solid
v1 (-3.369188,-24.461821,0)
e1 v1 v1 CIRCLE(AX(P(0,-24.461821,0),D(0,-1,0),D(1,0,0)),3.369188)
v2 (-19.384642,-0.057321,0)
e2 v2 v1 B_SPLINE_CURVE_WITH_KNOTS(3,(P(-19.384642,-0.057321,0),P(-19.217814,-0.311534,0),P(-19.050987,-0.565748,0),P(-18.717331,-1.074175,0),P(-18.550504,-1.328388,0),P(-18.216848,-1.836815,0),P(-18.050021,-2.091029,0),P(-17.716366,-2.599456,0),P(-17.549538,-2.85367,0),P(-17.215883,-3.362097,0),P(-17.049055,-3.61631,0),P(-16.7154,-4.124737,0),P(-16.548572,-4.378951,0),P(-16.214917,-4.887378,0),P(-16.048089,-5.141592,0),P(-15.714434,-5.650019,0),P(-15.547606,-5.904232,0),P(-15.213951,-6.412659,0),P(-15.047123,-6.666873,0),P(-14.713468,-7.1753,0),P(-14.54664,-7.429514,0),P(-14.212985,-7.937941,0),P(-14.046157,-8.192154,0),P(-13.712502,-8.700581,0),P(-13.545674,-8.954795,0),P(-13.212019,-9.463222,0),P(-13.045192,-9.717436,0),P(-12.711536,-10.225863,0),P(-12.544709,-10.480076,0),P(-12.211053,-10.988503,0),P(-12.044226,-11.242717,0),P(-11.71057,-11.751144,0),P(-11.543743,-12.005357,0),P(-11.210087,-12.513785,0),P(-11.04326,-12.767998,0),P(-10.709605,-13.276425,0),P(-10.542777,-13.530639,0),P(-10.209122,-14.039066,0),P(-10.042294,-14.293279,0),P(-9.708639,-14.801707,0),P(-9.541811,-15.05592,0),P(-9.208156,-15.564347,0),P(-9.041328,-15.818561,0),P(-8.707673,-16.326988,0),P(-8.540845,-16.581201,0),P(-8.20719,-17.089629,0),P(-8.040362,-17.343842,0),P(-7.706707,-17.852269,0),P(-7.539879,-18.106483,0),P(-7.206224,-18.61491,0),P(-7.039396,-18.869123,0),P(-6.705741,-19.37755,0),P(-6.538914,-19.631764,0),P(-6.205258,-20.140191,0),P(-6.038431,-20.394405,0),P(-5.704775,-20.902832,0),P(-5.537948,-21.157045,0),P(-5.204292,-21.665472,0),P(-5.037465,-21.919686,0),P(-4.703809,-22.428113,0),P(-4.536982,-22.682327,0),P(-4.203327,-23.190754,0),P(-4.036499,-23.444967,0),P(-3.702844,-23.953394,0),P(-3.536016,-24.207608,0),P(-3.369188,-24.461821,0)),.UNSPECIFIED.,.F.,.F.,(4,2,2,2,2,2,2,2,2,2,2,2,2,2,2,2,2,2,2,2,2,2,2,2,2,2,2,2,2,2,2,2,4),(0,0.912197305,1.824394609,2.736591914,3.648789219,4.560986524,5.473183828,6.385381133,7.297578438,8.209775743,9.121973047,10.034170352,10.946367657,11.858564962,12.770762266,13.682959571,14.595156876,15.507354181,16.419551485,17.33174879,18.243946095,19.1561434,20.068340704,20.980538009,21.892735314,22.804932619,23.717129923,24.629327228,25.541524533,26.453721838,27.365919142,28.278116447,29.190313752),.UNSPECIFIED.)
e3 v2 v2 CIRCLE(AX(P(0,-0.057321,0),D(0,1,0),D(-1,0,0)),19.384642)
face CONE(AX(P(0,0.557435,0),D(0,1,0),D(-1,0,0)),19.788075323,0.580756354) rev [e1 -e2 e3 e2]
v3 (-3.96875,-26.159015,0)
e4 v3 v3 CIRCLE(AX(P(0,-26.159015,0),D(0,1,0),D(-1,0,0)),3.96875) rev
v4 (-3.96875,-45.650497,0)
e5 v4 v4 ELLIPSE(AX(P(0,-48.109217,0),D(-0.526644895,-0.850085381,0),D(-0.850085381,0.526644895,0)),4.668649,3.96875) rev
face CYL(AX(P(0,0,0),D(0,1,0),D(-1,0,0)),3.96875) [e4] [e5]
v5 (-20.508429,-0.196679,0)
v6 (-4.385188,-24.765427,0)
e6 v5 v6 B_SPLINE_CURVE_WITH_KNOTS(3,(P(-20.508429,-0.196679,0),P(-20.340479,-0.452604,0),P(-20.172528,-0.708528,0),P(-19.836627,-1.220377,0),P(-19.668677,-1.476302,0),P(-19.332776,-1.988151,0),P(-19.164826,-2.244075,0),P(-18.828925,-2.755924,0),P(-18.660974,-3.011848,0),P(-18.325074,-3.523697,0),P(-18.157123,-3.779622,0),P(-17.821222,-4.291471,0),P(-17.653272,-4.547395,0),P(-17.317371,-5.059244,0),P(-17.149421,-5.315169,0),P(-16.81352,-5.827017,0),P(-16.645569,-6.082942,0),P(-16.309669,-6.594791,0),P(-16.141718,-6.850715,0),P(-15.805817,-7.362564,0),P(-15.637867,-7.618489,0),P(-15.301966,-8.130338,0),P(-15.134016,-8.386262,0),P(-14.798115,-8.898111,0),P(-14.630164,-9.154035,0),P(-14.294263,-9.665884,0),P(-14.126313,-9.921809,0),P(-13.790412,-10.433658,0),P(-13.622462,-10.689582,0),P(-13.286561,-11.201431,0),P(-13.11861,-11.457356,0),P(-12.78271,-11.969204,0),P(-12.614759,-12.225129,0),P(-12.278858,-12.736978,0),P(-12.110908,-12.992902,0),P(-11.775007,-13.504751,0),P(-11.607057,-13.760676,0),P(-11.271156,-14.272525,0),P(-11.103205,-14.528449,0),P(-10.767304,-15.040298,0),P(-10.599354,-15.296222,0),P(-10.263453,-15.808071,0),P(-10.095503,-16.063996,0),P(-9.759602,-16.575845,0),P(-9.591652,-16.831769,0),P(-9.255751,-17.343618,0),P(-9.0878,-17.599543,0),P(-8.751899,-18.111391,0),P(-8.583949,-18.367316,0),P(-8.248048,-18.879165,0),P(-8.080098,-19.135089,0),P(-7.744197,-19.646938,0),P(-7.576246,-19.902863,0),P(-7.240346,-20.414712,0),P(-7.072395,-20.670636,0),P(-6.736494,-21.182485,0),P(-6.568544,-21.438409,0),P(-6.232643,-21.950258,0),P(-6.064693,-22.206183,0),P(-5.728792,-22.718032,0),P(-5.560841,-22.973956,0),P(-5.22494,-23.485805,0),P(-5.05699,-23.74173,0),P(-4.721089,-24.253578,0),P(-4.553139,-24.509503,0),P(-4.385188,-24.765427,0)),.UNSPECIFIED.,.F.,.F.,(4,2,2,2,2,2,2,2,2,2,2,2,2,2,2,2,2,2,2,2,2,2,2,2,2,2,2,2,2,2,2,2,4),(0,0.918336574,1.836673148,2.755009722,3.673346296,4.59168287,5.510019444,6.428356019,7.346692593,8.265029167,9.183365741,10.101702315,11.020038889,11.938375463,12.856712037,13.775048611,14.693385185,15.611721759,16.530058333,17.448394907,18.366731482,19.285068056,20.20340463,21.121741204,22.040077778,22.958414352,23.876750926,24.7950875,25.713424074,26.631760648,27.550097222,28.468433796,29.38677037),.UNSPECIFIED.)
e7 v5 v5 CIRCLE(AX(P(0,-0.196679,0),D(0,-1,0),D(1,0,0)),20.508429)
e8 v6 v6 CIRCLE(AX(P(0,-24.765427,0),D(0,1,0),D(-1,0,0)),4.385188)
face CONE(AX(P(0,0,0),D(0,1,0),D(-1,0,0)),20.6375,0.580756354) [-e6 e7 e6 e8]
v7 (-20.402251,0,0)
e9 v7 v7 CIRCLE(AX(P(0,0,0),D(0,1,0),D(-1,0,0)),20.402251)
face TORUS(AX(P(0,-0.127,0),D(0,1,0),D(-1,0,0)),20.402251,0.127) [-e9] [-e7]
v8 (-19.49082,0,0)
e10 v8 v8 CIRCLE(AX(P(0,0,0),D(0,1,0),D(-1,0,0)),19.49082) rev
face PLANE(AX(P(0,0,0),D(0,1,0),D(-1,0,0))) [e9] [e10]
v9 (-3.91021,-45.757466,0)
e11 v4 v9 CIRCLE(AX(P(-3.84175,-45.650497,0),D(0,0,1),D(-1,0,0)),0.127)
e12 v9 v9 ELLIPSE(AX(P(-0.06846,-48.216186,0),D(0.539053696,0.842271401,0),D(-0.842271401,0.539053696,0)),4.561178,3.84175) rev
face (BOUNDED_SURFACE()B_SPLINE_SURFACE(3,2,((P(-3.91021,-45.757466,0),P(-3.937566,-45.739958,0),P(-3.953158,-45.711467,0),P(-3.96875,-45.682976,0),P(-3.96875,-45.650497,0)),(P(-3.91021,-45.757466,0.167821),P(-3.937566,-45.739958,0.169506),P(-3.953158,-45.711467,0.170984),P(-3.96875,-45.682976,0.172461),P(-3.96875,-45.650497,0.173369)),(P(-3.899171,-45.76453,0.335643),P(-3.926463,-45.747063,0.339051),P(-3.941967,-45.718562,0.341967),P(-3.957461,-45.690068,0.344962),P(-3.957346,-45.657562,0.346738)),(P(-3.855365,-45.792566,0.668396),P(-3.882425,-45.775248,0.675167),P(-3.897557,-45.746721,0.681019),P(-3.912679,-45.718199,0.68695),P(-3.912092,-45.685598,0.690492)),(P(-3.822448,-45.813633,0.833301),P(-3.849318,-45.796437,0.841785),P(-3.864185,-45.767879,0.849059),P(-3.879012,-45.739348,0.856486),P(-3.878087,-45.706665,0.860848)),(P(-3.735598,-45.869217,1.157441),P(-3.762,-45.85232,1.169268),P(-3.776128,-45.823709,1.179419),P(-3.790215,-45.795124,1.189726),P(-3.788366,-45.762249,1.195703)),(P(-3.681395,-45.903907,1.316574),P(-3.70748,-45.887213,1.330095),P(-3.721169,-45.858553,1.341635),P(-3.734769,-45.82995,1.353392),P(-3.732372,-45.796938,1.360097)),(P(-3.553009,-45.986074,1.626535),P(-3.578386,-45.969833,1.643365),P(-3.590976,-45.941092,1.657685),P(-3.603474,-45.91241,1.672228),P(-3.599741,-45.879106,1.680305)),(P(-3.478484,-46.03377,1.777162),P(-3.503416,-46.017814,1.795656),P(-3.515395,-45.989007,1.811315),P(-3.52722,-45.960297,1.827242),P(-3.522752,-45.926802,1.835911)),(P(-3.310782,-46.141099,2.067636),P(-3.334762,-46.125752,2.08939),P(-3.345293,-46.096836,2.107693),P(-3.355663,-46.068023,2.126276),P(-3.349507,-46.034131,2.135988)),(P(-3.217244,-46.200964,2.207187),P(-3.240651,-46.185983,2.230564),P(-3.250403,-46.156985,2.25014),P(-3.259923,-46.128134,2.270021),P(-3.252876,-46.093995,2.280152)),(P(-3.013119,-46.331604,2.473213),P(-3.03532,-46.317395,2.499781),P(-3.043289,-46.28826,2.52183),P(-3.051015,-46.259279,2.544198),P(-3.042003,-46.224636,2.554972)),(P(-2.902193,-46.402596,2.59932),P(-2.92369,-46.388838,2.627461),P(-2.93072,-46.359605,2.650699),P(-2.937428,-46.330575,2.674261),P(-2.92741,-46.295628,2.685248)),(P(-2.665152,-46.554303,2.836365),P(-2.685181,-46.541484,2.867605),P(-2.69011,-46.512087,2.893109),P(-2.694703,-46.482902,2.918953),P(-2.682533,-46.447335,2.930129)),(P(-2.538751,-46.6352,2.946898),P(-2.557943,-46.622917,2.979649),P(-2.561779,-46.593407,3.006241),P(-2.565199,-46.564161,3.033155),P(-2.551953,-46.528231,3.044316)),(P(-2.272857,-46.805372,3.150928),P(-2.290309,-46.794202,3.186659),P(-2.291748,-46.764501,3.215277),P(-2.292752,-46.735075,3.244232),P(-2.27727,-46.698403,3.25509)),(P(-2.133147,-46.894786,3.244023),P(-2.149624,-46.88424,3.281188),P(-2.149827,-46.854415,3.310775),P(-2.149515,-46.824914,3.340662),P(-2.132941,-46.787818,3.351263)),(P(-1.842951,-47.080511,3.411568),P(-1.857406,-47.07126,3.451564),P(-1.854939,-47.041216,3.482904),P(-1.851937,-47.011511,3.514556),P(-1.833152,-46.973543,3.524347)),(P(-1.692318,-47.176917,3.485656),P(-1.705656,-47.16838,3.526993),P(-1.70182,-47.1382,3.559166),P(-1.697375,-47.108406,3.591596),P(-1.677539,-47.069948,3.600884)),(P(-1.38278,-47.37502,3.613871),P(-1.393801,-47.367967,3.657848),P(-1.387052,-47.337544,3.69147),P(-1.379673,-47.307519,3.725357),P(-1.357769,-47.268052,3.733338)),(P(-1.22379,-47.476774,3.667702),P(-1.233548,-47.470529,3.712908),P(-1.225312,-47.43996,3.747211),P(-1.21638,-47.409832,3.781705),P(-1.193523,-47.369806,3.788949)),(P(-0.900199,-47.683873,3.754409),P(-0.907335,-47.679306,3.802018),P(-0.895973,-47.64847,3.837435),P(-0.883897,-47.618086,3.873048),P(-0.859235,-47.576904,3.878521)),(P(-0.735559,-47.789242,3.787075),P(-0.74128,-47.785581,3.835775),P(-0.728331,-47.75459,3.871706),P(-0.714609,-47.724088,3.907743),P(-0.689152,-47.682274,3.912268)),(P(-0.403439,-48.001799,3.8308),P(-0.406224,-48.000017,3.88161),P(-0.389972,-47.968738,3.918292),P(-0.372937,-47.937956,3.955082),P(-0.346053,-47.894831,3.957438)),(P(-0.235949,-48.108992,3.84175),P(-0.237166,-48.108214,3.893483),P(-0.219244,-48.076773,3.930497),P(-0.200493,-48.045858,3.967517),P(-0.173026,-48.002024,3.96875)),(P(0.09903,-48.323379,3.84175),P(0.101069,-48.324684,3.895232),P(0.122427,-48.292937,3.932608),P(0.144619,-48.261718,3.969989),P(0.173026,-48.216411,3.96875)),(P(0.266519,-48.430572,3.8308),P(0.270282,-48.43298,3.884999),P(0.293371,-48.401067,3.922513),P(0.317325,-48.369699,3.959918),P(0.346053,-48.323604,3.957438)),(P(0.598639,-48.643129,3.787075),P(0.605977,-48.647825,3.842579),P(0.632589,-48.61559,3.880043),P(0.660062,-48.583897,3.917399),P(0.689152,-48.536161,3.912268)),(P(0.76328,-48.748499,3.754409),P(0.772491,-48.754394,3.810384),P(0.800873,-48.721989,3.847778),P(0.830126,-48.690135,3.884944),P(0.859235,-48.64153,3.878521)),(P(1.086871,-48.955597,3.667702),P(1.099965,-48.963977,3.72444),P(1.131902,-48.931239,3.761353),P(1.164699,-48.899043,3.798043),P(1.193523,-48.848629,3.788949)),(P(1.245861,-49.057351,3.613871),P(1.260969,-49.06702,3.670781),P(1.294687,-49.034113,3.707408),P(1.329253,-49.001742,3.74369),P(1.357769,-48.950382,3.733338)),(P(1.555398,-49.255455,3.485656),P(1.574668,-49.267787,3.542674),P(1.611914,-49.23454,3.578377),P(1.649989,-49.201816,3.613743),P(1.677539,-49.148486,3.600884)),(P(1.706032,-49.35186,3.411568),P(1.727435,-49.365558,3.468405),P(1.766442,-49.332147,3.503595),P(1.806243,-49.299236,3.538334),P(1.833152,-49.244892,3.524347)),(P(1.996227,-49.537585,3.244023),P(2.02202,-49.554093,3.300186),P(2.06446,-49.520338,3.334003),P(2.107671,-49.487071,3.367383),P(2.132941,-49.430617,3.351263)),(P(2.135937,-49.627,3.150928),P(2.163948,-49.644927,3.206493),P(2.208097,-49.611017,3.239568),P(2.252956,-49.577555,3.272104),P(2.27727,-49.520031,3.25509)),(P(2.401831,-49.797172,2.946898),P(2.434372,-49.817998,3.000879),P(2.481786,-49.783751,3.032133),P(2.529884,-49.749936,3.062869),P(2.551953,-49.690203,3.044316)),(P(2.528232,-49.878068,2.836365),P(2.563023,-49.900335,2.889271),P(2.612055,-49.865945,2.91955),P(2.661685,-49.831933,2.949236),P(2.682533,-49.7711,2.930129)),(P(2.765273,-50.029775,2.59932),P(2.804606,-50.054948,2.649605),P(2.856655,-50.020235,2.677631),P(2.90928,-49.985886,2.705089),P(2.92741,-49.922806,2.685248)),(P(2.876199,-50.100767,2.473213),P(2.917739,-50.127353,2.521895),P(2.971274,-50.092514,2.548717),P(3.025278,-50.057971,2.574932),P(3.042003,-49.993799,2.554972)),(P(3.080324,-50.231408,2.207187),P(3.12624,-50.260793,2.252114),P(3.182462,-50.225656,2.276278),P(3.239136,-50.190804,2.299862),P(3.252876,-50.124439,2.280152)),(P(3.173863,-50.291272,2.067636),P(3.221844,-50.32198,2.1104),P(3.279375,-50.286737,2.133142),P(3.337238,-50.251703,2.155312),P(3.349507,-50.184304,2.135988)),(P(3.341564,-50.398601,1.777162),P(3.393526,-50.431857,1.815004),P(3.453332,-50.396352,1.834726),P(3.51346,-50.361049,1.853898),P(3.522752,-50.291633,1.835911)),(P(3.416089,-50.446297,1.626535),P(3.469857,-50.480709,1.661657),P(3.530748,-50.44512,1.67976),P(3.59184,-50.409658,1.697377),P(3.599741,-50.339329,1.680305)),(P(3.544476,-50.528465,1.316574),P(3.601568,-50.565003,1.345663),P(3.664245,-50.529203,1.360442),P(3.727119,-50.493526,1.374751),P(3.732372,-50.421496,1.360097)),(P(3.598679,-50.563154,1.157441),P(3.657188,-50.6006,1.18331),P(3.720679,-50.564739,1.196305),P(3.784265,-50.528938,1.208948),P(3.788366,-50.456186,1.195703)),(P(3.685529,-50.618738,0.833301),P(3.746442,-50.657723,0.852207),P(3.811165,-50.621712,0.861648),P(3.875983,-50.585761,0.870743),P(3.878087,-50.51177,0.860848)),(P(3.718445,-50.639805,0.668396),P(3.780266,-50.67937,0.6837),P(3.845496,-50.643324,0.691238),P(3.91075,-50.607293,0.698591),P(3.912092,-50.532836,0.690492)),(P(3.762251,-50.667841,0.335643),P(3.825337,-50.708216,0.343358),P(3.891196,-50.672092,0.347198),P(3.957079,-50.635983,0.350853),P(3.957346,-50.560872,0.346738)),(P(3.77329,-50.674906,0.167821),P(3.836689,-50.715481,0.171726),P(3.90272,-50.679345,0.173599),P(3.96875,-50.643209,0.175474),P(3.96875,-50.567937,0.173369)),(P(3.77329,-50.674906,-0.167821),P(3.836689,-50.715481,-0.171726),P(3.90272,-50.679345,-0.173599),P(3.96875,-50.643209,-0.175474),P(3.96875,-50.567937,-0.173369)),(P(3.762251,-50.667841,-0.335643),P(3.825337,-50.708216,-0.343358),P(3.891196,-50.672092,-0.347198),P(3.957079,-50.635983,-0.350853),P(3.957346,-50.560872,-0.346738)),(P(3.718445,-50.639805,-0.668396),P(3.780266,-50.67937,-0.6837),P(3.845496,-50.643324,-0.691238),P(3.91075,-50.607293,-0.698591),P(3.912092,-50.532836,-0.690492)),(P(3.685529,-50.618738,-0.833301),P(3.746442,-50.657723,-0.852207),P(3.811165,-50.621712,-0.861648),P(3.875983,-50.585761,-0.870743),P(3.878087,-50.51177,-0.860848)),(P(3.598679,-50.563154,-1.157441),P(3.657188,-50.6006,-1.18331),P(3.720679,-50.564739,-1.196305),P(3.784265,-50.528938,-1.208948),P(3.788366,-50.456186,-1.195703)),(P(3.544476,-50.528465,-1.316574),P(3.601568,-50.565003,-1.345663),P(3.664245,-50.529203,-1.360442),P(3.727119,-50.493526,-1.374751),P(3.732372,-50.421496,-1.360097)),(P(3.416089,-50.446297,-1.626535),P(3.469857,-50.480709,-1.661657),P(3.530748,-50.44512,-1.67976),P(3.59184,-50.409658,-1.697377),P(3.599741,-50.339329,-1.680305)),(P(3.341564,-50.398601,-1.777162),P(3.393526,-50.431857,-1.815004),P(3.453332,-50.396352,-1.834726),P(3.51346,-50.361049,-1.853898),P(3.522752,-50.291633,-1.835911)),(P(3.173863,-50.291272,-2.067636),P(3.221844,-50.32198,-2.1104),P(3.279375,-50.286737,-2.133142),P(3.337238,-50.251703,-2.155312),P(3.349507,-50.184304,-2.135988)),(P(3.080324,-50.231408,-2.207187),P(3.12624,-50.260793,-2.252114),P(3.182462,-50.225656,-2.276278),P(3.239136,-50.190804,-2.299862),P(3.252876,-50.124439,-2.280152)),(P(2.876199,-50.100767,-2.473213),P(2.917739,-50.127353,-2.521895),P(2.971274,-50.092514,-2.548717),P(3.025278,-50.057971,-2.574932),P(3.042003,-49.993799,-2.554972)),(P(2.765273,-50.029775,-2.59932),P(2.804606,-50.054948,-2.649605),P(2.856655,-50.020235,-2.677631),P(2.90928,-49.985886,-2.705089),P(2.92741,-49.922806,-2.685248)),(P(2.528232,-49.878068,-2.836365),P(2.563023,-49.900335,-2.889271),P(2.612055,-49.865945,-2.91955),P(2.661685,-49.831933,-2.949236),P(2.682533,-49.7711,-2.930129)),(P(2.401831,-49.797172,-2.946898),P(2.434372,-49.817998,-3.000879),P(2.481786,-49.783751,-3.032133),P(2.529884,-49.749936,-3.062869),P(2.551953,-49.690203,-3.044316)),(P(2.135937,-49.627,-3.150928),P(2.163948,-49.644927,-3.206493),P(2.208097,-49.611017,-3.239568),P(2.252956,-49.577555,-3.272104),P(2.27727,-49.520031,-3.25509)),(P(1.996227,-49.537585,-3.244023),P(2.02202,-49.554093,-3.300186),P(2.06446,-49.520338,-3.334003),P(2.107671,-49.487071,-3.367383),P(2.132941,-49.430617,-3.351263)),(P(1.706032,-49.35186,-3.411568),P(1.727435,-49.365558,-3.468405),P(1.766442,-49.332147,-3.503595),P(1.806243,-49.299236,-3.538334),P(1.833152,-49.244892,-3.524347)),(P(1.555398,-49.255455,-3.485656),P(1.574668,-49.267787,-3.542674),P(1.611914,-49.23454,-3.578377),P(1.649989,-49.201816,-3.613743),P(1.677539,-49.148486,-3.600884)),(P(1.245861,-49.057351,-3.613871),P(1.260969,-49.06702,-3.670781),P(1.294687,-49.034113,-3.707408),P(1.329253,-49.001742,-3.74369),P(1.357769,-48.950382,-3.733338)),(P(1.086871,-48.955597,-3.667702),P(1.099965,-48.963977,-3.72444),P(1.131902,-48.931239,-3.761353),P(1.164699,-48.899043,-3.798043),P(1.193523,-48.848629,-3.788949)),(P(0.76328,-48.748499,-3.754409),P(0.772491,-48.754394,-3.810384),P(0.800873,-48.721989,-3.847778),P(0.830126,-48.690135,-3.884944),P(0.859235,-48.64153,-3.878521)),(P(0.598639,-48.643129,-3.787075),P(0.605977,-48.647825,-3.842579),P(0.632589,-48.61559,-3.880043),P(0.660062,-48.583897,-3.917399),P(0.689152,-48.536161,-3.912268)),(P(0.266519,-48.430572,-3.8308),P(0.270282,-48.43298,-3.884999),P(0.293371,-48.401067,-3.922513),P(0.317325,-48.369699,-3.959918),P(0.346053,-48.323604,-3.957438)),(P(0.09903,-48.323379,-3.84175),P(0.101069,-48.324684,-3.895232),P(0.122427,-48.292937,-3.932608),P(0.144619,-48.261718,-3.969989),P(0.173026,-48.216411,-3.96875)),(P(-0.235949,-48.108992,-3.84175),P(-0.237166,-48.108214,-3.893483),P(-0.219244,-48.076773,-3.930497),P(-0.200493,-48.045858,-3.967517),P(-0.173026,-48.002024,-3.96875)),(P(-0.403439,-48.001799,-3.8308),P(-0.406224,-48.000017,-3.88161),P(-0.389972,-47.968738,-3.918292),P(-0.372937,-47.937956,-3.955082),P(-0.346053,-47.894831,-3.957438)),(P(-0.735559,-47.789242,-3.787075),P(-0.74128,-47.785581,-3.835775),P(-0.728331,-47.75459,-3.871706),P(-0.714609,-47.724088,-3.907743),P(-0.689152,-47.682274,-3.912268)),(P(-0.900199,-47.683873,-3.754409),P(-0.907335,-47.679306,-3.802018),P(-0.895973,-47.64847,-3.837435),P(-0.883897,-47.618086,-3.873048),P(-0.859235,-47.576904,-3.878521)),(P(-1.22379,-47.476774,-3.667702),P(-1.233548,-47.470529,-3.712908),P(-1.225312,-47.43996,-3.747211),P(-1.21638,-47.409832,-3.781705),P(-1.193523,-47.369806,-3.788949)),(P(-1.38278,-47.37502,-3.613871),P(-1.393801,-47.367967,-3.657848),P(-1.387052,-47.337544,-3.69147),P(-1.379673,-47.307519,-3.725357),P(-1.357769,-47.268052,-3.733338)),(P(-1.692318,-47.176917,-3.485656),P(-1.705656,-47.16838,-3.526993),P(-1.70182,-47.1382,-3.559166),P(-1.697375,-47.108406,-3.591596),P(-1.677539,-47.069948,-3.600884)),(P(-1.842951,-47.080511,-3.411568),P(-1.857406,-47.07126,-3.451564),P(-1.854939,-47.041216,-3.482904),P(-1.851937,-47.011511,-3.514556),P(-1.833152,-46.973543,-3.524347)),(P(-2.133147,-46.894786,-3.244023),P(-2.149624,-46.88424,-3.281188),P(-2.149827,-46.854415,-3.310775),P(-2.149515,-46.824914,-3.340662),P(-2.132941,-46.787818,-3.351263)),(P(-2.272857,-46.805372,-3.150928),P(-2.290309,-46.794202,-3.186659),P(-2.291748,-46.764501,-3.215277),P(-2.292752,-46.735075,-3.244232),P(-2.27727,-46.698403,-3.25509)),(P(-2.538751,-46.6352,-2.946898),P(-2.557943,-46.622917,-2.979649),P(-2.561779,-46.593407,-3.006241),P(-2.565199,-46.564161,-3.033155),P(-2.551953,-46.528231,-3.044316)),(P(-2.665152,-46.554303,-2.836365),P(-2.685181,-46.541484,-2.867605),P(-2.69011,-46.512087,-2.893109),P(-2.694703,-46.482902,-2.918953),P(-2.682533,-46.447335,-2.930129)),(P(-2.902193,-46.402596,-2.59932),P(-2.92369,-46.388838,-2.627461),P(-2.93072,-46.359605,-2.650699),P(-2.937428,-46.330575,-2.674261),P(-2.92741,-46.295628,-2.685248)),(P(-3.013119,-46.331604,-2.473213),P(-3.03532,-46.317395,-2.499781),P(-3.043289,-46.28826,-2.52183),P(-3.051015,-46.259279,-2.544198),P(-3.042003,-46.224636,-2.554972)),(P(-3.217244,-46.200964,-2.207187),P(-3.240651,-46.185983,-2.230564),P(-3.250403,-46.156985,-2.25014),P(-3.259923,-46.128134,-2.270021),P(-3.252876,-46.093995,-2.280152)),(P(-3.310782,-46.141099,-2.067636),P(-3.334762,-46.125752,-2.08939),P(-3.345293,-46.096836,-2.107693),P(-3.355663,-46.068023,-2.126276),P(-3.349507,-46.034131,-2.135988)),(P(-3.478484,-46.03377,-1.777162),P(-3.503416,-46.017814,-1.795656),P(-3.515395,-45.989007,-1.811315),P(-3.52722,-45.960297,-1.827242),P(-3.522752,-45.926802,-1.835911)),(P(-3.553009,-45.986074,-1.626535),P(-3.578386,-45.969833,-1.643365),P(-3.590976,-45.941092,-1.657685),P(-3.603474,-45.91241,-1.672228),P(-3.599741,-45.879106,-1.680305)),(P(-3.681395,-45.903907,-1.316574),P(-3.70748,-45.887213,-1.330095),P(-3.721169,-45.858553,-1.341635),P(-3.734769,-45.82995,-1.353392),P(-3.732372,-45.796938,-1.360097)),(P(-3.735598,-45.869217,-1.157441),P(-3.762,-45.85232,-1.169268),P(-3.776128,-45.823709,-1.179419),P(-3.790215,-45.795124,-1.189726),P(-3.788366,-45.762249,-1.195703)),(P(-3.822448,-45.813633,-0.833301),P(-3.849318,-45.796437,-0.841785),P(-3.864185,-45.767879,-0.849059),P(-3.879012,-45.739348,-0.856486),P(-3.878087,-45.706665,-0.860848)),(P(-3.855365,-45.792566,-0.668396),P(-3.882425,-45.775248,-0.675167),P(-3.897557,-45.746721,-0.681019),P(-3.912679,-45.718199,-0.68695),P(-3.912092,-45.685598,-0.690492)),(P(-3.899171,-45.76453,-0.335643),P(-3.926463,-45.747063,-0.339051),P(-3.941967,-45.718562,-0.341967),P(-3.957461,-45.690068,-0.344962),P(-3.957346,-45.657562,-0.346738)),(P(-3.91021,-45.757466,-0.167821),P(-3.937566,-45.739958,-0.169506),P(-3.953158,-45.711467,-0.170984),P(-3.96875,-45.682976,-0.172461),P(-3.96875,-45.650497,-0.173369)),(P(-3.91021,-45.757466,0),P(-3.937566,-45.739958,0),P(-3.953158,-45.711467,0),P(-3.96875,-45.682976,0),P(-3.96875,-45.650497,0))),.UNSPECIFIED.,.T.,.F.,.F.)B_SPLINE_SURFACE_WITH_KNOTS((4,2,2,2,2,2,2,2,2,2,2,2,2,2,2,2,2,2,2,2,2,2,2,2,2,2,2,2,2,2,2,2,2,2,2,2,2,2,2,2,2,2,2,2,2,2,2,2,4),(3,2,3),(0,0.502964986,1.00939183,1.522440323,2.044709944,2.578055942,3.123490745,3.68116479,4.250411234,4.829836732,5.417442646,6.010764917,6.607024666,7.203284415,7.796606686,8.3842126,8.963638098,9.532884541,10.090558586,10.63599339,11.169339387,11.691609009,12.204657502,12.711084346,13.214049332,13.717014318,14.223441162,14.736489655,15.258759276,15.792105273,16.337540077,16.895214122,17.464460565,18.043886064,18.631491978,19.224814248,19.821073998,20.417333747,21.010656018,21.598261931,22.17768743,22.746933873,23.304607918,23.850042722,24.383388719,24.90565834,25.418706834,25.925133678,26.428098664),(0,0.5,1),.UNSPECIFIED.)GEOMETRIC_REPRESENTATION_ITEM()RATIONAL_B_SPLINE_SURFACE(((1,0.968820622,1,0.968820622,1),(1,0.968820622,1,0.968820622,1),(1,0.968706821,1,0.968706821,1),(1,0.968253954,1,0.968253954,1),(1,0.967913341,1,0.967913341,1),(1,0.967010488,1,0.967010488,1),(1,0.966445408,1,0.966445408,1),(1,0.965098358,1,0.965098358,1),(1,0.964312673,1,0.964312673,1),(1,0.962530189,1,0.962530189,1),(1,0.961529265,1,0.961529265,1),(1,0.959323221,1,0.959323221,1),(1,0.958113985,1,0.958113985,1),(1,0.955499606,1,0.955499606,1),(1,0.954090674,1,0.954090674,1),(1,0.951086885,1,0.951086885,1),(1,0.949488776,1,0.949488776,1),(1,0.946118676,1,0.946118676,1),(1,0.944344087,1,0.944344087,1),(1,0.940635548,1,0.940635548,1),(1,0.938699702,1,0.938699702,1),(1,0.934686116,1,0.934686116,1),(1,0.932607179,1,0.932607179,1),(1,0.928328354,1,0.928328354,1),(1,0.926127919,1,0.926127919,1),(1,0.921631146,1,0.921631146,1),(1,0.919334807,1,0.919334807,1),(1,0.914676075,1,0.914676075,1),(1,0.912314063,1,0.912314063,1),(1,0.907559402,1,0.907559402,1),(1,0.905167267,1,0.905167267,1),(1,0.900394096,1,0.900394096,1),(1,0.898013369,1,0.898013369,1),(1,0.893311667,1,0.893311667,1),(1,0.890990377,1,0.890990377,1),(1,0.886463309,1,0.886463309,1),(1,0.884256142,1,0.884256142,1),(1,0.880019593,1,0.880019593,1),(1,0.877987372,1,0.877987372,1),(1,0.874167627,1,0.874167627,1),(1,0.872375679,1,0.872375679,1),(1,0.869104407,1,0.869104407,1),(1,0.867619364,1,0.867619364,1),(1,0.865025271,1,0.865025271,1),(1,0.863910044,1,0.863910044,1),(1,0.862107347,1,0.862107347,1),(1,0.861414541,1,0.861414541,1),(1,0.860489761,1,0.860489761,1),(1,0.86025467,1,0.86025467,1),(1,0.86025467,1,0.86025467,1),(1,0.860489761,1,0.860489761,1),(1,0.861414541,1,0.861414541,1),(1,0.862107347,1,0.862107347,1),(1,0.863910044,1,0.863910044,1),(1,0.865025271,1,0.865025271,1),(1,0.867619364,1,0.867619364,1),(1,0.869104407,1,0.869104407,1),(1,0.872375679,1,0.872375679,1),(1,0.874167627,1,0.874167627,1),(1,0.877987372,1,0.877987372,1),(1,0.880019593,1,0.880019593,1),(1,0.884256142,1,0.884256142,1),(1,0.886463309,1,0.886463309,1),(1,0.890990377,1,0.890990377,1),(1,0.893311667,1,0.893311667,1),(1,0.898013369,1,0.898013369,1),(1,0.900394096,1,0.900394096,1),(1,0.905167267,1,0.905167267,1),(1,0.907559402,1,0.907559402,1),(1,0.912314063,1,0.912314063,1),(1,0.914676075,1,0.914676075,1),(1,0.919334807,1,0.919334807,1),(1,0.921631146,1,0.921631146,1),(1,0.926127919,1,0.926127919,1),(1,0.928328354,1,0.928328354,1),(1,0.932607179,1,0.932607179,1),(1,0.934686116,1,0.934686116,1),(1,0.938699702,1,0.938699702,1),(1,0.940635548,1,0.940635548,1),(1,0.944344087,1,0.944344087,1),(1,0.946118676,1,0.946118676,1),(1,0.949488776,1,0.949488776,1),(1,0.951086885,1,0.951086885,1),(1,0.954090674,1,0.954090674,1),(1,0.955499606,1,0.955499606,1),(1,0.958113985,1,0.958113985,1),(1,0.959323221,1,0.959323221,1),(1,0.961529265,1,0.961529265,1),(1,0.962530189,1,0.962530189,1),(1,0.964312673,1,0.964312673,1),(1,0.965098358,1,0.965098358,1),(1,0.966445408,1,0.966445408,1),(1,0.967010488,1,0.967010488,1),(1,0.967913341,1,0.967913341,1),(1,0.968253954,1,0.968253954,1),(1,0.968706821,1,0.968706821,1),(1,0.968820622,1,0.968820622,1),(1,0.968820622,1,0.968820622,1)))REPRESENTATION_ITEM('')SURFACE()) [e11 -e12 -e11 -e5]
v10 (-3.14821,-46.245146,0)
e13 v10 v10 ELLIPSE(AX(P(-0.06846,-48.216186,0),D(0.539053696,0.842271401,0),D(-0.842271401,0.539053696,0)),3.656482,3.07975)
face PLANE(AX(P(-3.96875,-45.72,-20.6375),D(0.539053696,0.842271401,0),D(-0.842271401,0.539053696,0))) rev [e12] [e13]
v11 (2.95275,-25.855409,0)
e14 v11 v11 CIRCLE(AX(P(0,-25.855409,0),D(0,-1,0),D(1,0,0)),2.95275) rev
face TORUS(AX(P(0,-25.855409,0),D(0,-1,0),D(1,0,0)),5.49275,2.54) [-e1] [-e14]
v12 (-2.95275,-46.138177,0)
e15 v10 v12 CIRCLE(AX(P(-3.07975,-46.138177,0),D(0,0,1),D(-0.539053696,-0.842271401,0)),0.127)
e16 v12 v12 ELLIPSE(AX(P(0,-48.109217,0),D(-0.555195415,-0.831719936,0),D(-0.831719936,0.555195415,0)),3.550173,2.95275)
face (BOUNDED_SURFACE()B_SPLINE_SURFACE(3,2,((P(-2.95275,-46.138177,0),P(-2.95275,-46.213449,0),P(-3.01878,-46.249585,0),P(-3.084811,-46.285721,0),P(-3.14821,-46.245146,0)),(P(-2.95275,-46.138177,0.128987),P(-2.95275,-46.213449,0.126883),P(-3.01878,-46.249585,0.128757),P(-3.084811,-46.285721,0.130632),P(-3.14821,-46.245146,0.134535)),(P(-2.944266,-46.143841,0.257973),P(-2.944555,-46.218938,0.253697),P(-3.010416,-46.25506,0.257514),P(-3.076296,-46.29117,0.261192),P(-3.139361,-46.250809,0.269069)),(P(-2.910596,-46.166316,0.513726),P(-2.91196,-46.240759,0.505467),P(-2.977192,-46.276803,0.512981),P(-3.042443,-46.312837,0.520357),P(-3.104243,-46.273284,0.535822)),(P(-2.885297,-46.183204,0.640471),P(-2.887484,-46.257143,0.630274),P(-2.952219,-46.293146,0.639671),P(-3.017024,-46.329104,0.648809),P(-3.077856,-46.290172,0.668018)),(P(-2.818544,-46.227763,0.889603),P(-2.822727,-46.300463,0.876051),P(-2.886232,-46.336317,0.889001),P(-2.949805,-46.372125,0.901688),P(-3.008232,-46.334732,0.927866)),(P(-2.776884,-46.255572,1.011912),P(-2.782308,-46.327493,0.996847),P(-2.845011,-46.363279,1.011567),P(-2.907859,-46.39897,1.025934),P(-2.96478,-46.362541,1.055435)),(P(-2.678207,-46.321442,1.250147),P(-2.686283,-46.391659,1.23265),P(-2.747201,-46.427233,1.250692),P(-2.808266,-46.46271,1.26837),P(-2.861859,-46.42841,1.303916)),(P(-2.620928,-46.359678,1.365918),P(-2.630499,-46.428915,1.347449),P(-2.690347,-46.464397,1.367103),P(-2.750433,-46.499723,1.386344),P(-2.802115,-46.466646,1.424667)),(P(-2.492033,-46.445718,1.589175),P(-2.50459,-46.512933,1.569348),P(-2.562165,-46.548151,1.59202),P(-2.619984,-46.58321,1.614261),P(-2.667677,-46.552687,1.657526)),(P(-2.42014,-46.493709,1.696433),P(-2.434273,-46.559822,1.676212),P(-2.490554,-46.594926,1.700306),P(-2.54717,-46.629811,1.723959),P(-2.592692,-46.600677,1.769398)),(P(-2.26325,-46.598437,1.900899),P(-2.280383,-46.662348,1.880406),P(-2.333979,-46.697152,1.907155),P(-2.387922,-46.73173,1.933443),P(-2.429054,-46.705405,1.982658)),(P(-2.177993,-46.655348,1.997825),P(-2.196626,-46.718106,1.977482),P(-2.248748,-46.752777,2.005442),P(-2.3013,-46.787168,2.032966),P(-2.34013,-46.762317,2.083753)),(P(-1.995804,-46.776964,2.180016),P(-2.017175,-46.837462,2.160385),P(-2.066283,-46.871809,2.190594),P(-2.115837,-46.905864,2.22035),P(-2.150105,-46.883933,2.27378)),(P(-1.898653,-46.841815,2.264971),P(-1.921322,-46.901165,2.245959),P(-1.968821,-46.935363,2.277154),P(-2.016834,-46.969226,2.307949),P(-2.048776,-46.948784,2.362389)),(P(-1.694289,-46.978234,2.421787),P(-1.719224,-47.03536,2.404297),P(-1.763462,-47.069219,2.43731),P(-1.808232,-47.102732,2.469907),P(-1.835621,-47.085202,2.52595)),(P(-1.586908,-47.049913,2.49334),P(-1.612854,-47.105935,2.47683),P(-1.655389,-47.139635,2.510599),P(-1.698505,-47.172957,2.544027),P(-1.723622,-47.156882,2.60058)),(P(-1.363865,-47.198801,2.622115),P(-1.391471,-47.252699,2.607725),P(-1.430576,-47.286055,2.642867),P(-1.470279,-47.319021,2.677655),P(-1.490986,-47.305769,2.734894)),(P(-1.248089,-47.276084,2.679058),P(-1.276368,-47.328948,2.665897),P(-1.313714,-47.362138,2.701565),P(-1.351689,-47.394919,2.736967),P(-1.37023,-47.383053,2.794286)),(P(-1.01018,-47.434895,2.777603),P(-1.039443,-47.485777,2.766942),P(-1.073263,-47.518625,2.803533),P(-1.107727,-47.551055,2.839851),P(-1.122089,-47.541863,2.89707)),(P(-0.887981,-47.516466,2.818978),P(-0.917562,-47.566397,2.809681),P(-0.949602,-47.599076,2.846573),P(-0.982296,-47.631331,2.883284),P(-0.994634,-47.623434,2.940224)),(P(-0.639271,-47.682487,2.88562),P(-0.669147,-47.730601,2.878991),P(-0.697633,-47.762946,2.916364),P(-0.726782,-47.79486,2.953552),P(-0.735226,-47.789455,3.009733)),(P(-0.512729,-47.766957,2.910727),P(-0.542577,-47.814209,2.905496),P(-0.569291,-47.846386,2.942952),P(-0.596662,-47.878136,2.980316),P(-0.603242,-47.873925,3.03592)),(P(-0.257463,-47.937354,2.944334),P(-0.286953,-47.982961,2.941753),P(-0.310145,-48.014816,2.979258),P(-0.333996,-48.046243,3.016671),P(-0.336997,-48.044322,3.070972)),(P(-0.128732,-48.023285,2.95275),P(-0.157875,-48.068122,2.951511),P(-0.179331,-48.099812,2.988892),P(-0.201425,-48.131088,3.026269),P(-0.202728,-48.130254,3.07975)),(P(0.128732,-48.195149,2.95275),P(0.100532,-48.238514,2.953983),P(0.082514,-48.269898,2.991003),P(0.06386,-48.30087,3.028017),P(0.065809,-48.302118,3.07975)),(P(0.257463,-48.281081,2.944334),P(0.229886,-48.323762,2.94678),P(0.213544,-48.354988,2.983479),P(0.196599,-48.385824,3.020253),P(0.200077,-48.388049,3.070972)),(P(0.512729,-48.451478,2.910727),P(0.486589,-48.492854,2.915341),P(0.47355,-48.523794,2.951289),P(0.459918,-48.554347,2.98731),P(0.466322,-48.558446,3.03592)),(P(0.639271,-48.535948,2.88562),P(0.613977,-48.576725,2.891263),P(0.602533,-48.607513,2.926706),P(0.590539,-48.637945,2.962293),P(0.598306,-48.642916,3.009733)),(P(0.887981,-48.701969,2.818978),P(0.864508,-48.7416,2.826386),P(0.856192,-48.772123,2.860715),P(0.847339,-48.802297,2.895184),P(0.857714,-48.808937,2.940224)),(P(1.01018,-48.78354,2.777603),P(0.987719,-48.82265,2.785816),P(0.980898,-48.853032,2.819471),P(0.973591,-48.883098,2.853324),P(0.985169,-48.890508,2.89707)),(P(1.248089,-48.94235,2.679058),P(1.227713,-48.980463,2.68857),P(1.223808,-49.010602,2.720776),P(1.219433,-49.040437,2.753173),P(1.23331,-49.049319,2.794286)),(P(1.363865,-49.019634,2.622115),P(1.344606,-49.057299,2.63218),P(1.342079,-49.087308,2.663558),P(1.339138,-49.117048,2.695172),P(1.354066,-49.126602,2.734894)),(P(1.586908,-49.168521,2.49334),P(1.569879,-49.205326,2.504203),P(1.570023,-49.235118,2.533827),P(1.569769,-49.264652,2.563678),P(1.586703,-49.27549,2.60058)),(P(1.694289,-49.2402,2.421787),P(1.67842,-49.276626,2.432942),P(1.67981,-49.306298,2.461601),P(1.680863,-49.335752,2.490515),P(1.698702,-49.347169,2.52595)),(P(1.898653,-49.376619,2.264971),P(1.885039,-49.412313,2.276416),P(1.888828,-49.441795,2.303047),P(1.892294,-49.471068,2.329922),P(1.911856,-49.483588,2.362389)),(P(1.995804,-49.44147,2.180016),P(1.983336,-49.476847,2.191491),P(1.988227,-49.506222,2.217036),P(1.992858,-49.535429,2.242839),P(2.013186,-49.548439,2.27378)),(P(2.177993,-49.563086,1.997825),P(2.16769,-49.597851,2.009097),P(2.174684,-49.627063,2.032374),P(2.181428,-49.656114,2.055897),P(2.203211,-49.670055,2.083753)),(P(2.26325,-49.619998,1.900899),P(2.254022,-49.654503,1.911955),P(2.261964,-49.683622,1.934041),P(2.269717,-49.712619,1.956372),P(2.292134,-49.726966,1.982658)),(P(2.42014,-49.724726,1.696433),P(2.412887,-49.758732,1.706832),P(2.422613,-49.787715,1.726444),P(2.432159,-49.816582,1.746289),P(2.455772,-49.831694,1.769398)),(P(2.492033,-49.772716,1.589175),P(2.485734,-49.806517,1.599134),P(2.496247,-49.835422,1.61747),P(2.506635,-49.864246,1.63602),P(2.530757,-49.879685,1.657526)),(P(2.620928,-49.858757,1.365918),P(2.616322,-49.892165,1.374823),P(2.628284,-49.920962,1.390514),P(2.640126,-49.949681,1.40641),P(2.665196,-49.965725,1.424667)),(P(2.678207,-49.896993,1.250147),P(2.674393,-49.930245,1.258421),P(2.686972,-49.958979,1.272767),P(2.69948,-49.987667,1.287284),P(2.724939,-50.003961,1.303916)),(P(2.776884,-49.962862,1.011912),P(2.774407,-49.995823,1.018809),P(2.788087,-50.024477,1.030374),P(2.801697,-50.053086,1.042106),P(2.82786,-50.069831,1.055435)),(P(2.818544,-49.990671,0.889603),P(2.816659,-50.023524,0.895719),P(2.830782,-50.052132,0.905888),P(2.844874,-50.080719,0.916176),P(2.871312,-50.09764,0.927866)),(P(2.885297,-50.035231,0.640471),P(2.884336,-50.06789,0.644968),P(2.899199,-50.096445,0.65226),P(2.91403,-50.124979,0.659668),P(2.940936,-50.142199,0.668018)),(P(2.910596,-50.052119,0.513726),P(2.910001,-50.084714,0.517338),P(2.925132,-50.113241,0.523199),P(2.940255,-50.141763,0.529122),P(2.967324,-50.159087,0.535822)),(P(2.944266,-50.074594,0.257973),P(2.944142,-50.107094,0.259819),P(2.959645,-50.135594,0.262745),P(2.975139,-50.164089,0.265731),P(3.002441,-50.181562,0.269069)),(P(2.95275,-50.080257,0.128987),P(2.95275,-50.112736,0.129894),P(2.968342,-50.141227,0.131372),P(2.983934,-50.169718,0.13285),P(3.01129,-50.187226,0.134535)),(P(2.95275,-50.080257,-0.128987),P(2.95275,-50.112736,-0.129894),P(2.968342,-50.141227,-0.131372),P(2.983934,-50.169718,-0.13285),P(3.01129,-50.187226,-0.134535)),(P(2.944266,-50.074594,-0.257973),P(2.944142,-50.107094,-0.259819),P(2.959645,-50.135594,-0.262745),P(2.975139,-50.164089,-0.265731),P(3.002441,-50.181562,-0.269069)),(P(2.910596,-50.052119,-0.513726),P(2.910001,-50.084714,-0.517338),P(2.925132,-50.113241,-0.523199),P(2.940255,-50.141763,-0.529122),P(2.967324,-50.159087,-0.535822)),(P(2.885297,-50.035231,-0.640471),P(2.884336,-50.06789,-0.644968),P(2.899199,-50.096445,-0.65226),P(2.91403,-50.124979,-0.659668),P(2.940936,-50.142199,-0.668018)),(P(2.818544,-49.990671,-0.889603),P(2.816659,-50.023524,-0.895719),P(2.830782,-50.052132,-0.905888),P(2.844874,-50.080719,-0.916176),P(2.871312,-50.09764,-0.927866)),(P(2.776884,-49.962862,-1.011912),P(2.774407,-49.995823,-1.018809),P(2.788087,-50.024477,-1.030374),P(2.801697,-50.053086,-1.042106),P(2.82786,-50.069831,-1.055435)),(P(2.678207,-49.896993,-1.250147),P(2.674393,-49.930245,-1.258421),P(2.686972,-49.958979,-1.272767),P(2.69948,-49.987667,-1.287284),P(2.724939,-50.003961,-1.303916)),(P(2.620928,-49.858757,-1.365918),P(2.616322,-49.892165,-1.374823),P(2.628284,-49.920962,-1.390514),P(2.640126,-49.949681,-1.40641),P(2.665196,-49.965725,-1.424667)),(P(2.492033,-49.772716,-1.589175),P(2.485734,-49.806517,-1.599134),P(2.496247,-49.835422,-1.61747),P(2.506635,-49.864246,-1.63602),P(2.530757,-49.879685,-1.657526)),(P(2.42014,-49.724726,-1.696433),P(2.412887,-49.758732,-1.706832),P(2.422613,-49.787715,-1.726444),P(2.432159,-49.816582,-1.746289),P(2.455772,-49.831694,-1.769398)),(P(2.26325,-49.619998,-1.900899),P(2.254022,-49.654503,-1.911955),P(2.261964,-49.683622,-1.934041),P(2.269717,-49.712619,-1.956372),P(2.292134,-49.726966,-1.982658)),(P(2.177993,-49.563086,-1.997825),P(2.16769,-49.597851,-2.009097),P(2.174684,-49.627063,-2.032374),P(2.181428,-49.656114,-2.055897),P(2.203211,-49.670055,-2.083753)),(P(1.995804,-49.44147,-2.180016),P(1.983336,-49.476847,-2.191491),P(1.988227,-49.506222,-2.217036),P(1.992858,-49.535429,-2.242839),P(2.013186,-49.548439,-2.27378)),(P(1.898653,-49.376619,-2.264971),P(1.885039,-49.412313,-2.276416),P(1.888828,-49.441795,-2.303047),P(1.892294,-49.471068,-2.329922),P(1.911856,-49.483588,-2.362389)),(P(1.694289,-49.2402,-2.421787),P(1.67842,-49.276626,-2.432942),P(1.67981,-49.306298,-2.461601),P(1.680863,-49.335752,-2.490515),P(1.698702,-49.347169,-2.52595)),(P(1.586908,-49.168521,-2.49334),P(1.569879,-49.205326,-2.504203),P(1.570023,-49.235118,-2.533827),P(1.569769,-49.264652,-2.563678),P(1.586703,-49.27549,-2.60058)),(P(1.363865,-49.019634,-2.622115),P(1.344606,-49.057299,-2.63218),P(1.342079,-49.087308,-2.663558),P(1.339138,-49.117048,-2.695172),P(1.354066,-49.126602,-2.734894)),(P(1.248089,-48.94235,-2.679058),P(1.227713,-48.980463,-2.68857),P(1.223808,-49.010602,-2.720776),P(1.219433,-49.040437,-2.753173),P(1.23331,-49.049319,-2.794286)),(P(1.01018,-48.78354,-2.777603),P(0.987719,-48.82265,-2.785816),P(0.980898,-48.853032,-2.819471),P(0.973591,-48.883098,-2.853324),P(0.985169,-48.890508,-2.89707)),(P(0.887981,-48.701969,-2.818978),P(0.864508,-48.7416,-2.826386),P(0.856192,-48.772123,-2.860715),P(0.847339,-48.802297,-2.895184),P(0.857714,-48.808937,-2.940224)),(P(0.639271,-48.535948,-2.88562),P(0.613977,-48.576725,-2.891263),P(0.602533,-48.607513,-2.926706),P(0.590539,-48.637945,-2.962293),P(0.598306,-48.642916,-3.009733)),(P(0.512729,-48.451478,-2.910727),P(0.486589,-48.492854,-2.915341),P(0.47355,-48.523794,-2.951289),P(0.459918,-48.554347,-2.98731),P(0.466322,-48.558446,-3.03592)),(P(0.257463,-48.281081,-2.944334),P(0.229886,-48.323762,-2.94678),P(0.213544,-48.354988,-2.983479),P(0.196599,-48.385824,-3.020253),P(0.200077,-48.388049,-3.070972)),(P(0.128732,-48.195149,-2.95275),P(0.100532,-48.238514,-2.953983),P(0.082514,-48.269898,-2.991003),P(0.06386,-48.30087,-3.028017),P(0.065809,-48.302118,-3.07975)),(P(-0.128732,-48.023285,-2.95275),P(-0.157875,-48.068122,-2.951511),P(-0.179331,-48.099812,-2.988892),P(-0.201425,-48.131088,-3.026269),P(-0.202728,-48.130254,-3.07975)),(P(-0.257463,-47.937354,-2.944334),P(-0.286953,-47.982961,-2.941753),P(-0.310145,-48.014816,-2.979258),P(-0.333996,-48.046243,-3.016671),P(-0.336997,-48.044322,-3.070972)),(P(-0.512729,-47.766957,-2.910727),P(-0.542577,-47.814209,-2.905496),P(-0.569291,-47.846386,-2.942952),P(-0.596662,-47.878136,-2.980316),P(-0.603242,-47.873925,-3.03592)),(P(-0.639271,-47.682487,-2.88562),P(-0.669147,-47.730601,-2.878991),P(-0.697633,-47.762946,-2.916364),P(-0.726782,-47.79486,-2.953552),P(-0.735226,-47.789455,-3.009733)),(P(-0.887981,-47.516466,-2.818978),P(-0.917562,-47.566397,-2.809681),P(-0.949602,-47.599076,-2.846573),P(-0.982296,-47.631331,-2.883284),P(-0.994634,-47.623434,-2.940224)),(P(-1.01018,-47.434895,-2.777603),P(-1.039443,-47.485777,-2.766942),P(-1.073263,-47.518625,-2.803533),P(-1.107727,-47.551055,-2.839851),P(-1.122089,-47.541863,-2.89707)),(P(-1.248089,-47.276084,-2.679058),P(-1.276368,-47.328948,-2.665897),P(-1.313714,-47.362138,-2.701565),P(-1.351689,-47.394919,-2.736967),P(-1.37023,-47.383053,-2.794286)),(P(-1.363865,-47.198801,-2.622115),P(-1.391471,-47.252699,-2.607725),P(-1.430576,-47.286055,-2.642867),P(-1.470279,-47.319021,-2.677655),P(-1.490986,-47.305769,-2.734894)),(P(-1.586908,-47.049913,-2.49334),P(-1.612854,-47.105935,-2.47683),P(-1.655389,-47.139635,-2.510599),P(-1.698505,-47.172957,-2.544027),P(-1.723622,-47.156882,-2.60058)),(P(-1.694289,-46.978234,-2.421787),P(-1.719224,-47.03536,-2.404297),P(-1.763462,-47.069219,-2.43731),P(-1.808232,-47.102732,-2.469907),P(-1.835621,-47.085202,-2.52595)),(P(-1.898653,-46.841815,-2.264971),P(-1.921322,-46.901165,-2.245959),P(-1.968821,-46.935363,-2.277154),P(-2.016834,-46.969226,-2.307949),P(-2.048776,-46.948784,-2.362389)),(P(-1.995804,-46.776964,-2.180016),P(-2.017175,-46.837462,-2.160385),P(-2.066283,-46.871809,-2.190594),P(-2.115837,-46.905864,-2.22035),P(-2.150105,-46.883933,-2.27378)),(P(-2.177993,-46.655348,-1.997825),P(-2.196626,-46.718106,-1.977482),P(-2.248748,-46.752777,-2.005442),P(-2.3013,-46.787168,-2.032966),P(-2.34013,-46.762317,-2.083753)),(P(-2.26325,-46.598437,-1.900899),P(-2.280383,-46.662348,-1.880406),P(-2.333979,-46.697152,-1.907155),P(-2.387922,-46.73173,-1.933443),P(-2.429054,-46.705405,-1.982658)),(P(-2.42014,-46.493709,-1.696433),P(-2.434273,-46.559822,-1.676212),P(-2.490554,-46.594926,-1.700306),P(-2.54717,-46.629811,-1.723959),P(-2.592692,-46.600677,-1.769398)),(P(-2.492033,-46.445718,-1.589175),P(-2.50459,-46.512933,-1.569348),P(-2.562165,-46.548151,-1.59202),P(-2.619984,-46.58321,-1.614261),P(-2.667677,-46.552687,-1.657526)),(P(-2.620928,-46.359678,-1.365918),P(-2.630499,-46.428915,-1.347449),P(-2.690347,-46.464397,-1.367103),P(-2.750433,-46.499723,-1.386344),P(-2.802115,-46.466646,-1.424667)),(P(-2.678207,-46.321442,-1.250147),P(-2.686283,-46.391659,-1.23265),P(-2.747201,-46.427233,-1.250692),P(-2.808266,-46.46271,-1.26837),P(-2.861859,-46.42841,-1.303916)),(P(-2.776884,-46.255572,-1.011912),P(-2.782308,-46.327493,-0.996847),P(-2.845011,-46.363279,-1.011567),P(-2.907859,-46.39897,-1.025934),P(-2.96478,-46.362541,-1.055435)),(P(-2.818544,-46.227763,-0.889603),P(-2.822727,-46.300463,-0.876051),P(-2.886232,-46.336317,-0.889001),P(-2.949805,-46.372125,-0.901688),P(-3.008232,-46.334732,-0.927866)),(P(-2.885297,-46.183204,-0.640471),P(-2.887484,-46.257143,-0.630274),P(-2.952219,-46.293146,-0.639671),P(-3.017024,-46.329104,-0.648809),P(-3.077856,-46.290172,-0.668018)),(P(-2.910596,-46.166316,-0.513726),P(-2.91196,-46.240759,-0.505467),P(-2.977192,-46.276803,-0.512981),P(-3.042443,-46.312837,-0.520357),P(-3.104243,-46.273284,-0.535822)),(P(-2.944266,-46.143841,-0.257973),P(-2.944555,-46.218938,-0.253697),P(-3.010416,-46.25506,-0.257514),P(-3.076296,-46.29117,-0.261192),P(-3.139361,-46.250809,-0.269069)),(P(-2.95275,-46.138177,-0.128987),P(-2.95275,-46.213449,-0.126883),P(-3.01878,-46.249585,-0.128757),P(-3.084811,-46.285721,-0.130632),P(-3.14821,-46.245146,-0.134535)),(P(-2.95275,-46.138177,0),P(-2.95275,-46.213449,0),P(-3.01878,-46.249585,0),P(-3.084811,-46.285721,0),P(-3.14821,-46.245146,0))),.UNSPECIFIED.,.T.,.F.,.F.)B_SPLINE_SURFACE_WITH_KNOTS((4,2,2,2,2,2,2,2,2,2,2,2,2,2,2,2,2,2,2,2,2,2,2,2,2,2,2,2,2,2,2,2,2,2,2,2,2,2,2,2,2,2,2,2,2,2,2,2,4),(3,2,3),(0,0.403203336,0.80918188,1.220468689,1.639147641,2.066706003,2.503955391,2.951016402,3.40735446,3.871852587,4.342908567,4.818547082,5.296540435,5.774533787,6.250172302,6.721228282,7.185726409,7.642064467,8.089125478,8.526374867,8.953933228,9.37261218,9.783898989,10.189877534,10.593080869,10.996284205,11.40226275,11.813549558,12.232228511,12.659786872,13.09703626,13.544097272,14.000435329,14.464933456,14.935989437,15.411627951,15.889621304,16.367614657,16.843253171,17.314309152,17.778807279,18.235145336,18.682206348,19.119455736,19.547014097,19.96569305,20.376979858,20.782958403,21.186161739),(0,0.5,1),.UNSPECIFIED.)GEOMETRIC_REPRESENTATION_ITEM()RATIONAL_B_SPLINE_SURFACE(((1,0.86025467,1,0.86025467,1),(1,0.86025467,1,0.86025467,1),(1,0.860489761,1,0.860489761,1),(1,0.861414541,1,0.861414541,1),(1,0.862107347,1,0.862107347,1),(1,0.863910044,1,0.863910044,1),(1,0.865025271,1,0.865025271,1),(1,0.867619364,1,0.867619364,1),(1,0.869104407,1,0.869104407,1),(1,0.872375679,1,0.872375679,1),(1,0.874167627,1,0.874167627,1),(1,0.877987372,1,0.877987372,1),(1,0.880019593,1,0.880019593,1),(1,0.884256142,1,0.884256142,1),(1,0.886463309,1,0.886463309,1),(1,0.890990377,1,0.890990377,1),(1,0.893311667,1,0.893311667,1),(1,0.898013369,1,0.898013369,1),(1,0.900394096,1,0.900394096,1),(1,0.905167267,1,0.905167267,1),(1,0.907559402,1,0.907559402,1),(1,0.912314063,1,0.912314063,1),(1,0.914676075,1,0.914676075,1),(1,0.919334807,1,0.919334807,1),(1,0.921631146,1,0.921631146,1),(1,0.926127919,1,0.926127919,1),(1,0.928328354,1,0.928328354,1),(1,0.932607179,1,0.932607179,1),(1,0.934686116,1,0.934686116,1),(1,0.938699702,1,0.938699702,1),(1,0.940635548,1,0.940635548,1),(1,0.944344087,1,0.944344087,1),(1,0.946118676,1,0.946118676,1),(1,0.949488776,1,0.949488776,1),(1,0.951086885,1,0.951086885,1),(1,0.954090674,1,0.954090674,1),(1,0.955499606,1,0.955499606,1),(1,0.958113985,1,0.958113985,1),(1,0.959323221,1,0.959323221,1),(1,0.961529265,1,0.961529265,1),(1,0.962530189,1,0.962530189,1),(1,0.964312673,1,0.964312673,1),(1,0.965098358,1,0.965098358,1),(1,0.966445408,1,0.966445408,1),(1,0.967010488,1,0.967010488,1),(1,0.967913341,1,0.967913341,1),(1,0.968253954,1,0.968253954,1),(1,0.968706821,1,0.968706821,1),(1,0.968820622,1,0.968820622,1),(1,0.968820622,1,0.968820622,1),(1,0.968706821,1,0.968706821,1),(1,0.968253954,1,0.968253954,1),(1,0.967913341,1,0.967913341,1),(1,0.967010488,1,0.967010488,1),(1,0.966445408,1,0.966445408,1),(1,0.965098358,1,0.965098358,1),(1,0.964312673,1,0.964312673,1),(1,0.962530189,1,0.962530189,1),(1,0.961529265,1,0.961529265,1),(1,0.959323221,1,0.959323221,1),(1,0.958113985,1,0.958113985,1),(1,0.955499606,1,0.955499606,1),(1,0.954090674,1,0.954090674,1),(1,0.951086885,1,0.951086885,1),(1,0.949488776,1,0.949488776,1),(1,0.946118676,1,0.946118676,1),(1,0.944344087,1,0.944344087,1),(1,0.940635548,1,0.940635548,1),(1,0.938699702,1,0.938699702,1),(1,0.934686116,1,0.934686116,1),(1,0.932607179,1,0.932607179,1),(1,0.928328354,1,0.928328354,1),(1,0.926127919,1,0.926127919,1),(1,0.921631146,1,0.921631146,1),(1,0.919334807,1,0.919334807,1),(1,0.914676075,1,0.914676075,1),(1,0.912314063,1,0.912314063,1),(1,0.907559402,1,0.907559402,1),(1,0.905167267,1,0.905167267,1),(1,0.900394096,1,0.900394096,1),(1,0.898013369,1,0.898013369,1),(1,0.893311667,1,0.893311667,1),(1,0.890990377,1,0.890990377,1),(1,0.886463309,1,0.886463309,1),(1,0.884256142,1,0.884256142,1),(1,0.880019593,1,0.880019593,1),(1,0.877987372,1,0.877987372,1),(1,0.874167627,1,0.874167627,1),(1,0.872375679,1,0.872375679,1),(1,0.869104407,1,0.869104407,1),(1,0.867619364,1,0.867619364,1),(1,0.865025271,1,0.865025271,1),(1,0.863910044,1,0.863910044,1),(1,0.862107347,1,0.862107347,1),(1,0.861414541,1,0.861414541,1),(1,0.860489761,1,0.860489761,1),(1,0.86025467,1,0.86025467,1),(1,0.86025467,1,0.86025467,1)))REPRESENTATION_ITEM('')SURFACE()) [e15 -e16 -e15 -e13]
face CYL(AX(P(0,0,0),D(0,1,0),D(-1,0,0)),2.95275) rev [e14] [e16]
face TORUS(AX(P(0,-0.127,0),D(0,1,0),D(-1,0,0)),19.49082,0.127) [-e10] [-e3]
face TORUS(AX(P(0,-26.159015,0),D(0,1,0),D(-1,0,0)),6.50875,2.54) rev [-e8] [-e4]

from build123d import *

# Parameters (mm, degrees)
SHELL1_T                = -1.016
CUT_EXTRUDE1_DEPTH      = 60.691688806
CUT_EXTRUDE1_DEPTH_BACK = 60.691688806
FILLET1_R               = 2.54
FILLET2_R               = 0.127


with BuildPart() as part:
    # Sketch1 → Revolve1 (revolve)
    with BuildSketch(Plane.XY):
        Polygon((0, 0), (0, -52.07), (-3.96875, -52.07), (-3.96875, -25.4), (-20.6375, 0), align=None)
    revolve(axis=Axis((0, 0, 0), (0, -1, 0)))

    # Shell1
    shell1_openings = [part.faces().sort_by_distance(p)[0] for p in [
        (0, 0, 0),
    ]]
    offset(amount=SHELL1_T, openings=shell1_openings, kind=Kind.INTERSECTION)

    # Sketch2 → Cut-Extrude1 (cut, two sides: drawn at the far end of the back side and taken through both)
    with BuildSketch(Plane.XY.offset(-CUT_EXTRUDE1_DEPTH_BACK)):
        Polygon((-3.96875, -45.72), (3.96875, -50.8), (3.96875, -52.07), (-3.96875, -52.07), align=None)
    extrude(amount=CUT_EXTRUDE1_DEPTH + CUT_EXTRUDE1_DEPTH_BACK, mode=Mode.SUBTRACT)

    # Fillet1
    fillet1_edges = [part.edges().sort_by_distance(p)[0] for p in [
        (2.95275, -25.096394118, 0),
        (3.96875, -25.4, 0),
    ]]
    fillet(fillet1_edges, radius=FILLET1_R)

    # Fillet2
    fillet2_edges = [part.edges().sort_by_distance(p)[0] for p in [
        (19.42225864, 0, 0),
        (1e-09, -48.260000001, -3.96875),
        (2.952749993, -50.149759995, -0.000204398),
        (20.6375, 0, 0),
    ]]
    fillet(fillet2_edges, radius=FILLET2_R)


solid = part.part
